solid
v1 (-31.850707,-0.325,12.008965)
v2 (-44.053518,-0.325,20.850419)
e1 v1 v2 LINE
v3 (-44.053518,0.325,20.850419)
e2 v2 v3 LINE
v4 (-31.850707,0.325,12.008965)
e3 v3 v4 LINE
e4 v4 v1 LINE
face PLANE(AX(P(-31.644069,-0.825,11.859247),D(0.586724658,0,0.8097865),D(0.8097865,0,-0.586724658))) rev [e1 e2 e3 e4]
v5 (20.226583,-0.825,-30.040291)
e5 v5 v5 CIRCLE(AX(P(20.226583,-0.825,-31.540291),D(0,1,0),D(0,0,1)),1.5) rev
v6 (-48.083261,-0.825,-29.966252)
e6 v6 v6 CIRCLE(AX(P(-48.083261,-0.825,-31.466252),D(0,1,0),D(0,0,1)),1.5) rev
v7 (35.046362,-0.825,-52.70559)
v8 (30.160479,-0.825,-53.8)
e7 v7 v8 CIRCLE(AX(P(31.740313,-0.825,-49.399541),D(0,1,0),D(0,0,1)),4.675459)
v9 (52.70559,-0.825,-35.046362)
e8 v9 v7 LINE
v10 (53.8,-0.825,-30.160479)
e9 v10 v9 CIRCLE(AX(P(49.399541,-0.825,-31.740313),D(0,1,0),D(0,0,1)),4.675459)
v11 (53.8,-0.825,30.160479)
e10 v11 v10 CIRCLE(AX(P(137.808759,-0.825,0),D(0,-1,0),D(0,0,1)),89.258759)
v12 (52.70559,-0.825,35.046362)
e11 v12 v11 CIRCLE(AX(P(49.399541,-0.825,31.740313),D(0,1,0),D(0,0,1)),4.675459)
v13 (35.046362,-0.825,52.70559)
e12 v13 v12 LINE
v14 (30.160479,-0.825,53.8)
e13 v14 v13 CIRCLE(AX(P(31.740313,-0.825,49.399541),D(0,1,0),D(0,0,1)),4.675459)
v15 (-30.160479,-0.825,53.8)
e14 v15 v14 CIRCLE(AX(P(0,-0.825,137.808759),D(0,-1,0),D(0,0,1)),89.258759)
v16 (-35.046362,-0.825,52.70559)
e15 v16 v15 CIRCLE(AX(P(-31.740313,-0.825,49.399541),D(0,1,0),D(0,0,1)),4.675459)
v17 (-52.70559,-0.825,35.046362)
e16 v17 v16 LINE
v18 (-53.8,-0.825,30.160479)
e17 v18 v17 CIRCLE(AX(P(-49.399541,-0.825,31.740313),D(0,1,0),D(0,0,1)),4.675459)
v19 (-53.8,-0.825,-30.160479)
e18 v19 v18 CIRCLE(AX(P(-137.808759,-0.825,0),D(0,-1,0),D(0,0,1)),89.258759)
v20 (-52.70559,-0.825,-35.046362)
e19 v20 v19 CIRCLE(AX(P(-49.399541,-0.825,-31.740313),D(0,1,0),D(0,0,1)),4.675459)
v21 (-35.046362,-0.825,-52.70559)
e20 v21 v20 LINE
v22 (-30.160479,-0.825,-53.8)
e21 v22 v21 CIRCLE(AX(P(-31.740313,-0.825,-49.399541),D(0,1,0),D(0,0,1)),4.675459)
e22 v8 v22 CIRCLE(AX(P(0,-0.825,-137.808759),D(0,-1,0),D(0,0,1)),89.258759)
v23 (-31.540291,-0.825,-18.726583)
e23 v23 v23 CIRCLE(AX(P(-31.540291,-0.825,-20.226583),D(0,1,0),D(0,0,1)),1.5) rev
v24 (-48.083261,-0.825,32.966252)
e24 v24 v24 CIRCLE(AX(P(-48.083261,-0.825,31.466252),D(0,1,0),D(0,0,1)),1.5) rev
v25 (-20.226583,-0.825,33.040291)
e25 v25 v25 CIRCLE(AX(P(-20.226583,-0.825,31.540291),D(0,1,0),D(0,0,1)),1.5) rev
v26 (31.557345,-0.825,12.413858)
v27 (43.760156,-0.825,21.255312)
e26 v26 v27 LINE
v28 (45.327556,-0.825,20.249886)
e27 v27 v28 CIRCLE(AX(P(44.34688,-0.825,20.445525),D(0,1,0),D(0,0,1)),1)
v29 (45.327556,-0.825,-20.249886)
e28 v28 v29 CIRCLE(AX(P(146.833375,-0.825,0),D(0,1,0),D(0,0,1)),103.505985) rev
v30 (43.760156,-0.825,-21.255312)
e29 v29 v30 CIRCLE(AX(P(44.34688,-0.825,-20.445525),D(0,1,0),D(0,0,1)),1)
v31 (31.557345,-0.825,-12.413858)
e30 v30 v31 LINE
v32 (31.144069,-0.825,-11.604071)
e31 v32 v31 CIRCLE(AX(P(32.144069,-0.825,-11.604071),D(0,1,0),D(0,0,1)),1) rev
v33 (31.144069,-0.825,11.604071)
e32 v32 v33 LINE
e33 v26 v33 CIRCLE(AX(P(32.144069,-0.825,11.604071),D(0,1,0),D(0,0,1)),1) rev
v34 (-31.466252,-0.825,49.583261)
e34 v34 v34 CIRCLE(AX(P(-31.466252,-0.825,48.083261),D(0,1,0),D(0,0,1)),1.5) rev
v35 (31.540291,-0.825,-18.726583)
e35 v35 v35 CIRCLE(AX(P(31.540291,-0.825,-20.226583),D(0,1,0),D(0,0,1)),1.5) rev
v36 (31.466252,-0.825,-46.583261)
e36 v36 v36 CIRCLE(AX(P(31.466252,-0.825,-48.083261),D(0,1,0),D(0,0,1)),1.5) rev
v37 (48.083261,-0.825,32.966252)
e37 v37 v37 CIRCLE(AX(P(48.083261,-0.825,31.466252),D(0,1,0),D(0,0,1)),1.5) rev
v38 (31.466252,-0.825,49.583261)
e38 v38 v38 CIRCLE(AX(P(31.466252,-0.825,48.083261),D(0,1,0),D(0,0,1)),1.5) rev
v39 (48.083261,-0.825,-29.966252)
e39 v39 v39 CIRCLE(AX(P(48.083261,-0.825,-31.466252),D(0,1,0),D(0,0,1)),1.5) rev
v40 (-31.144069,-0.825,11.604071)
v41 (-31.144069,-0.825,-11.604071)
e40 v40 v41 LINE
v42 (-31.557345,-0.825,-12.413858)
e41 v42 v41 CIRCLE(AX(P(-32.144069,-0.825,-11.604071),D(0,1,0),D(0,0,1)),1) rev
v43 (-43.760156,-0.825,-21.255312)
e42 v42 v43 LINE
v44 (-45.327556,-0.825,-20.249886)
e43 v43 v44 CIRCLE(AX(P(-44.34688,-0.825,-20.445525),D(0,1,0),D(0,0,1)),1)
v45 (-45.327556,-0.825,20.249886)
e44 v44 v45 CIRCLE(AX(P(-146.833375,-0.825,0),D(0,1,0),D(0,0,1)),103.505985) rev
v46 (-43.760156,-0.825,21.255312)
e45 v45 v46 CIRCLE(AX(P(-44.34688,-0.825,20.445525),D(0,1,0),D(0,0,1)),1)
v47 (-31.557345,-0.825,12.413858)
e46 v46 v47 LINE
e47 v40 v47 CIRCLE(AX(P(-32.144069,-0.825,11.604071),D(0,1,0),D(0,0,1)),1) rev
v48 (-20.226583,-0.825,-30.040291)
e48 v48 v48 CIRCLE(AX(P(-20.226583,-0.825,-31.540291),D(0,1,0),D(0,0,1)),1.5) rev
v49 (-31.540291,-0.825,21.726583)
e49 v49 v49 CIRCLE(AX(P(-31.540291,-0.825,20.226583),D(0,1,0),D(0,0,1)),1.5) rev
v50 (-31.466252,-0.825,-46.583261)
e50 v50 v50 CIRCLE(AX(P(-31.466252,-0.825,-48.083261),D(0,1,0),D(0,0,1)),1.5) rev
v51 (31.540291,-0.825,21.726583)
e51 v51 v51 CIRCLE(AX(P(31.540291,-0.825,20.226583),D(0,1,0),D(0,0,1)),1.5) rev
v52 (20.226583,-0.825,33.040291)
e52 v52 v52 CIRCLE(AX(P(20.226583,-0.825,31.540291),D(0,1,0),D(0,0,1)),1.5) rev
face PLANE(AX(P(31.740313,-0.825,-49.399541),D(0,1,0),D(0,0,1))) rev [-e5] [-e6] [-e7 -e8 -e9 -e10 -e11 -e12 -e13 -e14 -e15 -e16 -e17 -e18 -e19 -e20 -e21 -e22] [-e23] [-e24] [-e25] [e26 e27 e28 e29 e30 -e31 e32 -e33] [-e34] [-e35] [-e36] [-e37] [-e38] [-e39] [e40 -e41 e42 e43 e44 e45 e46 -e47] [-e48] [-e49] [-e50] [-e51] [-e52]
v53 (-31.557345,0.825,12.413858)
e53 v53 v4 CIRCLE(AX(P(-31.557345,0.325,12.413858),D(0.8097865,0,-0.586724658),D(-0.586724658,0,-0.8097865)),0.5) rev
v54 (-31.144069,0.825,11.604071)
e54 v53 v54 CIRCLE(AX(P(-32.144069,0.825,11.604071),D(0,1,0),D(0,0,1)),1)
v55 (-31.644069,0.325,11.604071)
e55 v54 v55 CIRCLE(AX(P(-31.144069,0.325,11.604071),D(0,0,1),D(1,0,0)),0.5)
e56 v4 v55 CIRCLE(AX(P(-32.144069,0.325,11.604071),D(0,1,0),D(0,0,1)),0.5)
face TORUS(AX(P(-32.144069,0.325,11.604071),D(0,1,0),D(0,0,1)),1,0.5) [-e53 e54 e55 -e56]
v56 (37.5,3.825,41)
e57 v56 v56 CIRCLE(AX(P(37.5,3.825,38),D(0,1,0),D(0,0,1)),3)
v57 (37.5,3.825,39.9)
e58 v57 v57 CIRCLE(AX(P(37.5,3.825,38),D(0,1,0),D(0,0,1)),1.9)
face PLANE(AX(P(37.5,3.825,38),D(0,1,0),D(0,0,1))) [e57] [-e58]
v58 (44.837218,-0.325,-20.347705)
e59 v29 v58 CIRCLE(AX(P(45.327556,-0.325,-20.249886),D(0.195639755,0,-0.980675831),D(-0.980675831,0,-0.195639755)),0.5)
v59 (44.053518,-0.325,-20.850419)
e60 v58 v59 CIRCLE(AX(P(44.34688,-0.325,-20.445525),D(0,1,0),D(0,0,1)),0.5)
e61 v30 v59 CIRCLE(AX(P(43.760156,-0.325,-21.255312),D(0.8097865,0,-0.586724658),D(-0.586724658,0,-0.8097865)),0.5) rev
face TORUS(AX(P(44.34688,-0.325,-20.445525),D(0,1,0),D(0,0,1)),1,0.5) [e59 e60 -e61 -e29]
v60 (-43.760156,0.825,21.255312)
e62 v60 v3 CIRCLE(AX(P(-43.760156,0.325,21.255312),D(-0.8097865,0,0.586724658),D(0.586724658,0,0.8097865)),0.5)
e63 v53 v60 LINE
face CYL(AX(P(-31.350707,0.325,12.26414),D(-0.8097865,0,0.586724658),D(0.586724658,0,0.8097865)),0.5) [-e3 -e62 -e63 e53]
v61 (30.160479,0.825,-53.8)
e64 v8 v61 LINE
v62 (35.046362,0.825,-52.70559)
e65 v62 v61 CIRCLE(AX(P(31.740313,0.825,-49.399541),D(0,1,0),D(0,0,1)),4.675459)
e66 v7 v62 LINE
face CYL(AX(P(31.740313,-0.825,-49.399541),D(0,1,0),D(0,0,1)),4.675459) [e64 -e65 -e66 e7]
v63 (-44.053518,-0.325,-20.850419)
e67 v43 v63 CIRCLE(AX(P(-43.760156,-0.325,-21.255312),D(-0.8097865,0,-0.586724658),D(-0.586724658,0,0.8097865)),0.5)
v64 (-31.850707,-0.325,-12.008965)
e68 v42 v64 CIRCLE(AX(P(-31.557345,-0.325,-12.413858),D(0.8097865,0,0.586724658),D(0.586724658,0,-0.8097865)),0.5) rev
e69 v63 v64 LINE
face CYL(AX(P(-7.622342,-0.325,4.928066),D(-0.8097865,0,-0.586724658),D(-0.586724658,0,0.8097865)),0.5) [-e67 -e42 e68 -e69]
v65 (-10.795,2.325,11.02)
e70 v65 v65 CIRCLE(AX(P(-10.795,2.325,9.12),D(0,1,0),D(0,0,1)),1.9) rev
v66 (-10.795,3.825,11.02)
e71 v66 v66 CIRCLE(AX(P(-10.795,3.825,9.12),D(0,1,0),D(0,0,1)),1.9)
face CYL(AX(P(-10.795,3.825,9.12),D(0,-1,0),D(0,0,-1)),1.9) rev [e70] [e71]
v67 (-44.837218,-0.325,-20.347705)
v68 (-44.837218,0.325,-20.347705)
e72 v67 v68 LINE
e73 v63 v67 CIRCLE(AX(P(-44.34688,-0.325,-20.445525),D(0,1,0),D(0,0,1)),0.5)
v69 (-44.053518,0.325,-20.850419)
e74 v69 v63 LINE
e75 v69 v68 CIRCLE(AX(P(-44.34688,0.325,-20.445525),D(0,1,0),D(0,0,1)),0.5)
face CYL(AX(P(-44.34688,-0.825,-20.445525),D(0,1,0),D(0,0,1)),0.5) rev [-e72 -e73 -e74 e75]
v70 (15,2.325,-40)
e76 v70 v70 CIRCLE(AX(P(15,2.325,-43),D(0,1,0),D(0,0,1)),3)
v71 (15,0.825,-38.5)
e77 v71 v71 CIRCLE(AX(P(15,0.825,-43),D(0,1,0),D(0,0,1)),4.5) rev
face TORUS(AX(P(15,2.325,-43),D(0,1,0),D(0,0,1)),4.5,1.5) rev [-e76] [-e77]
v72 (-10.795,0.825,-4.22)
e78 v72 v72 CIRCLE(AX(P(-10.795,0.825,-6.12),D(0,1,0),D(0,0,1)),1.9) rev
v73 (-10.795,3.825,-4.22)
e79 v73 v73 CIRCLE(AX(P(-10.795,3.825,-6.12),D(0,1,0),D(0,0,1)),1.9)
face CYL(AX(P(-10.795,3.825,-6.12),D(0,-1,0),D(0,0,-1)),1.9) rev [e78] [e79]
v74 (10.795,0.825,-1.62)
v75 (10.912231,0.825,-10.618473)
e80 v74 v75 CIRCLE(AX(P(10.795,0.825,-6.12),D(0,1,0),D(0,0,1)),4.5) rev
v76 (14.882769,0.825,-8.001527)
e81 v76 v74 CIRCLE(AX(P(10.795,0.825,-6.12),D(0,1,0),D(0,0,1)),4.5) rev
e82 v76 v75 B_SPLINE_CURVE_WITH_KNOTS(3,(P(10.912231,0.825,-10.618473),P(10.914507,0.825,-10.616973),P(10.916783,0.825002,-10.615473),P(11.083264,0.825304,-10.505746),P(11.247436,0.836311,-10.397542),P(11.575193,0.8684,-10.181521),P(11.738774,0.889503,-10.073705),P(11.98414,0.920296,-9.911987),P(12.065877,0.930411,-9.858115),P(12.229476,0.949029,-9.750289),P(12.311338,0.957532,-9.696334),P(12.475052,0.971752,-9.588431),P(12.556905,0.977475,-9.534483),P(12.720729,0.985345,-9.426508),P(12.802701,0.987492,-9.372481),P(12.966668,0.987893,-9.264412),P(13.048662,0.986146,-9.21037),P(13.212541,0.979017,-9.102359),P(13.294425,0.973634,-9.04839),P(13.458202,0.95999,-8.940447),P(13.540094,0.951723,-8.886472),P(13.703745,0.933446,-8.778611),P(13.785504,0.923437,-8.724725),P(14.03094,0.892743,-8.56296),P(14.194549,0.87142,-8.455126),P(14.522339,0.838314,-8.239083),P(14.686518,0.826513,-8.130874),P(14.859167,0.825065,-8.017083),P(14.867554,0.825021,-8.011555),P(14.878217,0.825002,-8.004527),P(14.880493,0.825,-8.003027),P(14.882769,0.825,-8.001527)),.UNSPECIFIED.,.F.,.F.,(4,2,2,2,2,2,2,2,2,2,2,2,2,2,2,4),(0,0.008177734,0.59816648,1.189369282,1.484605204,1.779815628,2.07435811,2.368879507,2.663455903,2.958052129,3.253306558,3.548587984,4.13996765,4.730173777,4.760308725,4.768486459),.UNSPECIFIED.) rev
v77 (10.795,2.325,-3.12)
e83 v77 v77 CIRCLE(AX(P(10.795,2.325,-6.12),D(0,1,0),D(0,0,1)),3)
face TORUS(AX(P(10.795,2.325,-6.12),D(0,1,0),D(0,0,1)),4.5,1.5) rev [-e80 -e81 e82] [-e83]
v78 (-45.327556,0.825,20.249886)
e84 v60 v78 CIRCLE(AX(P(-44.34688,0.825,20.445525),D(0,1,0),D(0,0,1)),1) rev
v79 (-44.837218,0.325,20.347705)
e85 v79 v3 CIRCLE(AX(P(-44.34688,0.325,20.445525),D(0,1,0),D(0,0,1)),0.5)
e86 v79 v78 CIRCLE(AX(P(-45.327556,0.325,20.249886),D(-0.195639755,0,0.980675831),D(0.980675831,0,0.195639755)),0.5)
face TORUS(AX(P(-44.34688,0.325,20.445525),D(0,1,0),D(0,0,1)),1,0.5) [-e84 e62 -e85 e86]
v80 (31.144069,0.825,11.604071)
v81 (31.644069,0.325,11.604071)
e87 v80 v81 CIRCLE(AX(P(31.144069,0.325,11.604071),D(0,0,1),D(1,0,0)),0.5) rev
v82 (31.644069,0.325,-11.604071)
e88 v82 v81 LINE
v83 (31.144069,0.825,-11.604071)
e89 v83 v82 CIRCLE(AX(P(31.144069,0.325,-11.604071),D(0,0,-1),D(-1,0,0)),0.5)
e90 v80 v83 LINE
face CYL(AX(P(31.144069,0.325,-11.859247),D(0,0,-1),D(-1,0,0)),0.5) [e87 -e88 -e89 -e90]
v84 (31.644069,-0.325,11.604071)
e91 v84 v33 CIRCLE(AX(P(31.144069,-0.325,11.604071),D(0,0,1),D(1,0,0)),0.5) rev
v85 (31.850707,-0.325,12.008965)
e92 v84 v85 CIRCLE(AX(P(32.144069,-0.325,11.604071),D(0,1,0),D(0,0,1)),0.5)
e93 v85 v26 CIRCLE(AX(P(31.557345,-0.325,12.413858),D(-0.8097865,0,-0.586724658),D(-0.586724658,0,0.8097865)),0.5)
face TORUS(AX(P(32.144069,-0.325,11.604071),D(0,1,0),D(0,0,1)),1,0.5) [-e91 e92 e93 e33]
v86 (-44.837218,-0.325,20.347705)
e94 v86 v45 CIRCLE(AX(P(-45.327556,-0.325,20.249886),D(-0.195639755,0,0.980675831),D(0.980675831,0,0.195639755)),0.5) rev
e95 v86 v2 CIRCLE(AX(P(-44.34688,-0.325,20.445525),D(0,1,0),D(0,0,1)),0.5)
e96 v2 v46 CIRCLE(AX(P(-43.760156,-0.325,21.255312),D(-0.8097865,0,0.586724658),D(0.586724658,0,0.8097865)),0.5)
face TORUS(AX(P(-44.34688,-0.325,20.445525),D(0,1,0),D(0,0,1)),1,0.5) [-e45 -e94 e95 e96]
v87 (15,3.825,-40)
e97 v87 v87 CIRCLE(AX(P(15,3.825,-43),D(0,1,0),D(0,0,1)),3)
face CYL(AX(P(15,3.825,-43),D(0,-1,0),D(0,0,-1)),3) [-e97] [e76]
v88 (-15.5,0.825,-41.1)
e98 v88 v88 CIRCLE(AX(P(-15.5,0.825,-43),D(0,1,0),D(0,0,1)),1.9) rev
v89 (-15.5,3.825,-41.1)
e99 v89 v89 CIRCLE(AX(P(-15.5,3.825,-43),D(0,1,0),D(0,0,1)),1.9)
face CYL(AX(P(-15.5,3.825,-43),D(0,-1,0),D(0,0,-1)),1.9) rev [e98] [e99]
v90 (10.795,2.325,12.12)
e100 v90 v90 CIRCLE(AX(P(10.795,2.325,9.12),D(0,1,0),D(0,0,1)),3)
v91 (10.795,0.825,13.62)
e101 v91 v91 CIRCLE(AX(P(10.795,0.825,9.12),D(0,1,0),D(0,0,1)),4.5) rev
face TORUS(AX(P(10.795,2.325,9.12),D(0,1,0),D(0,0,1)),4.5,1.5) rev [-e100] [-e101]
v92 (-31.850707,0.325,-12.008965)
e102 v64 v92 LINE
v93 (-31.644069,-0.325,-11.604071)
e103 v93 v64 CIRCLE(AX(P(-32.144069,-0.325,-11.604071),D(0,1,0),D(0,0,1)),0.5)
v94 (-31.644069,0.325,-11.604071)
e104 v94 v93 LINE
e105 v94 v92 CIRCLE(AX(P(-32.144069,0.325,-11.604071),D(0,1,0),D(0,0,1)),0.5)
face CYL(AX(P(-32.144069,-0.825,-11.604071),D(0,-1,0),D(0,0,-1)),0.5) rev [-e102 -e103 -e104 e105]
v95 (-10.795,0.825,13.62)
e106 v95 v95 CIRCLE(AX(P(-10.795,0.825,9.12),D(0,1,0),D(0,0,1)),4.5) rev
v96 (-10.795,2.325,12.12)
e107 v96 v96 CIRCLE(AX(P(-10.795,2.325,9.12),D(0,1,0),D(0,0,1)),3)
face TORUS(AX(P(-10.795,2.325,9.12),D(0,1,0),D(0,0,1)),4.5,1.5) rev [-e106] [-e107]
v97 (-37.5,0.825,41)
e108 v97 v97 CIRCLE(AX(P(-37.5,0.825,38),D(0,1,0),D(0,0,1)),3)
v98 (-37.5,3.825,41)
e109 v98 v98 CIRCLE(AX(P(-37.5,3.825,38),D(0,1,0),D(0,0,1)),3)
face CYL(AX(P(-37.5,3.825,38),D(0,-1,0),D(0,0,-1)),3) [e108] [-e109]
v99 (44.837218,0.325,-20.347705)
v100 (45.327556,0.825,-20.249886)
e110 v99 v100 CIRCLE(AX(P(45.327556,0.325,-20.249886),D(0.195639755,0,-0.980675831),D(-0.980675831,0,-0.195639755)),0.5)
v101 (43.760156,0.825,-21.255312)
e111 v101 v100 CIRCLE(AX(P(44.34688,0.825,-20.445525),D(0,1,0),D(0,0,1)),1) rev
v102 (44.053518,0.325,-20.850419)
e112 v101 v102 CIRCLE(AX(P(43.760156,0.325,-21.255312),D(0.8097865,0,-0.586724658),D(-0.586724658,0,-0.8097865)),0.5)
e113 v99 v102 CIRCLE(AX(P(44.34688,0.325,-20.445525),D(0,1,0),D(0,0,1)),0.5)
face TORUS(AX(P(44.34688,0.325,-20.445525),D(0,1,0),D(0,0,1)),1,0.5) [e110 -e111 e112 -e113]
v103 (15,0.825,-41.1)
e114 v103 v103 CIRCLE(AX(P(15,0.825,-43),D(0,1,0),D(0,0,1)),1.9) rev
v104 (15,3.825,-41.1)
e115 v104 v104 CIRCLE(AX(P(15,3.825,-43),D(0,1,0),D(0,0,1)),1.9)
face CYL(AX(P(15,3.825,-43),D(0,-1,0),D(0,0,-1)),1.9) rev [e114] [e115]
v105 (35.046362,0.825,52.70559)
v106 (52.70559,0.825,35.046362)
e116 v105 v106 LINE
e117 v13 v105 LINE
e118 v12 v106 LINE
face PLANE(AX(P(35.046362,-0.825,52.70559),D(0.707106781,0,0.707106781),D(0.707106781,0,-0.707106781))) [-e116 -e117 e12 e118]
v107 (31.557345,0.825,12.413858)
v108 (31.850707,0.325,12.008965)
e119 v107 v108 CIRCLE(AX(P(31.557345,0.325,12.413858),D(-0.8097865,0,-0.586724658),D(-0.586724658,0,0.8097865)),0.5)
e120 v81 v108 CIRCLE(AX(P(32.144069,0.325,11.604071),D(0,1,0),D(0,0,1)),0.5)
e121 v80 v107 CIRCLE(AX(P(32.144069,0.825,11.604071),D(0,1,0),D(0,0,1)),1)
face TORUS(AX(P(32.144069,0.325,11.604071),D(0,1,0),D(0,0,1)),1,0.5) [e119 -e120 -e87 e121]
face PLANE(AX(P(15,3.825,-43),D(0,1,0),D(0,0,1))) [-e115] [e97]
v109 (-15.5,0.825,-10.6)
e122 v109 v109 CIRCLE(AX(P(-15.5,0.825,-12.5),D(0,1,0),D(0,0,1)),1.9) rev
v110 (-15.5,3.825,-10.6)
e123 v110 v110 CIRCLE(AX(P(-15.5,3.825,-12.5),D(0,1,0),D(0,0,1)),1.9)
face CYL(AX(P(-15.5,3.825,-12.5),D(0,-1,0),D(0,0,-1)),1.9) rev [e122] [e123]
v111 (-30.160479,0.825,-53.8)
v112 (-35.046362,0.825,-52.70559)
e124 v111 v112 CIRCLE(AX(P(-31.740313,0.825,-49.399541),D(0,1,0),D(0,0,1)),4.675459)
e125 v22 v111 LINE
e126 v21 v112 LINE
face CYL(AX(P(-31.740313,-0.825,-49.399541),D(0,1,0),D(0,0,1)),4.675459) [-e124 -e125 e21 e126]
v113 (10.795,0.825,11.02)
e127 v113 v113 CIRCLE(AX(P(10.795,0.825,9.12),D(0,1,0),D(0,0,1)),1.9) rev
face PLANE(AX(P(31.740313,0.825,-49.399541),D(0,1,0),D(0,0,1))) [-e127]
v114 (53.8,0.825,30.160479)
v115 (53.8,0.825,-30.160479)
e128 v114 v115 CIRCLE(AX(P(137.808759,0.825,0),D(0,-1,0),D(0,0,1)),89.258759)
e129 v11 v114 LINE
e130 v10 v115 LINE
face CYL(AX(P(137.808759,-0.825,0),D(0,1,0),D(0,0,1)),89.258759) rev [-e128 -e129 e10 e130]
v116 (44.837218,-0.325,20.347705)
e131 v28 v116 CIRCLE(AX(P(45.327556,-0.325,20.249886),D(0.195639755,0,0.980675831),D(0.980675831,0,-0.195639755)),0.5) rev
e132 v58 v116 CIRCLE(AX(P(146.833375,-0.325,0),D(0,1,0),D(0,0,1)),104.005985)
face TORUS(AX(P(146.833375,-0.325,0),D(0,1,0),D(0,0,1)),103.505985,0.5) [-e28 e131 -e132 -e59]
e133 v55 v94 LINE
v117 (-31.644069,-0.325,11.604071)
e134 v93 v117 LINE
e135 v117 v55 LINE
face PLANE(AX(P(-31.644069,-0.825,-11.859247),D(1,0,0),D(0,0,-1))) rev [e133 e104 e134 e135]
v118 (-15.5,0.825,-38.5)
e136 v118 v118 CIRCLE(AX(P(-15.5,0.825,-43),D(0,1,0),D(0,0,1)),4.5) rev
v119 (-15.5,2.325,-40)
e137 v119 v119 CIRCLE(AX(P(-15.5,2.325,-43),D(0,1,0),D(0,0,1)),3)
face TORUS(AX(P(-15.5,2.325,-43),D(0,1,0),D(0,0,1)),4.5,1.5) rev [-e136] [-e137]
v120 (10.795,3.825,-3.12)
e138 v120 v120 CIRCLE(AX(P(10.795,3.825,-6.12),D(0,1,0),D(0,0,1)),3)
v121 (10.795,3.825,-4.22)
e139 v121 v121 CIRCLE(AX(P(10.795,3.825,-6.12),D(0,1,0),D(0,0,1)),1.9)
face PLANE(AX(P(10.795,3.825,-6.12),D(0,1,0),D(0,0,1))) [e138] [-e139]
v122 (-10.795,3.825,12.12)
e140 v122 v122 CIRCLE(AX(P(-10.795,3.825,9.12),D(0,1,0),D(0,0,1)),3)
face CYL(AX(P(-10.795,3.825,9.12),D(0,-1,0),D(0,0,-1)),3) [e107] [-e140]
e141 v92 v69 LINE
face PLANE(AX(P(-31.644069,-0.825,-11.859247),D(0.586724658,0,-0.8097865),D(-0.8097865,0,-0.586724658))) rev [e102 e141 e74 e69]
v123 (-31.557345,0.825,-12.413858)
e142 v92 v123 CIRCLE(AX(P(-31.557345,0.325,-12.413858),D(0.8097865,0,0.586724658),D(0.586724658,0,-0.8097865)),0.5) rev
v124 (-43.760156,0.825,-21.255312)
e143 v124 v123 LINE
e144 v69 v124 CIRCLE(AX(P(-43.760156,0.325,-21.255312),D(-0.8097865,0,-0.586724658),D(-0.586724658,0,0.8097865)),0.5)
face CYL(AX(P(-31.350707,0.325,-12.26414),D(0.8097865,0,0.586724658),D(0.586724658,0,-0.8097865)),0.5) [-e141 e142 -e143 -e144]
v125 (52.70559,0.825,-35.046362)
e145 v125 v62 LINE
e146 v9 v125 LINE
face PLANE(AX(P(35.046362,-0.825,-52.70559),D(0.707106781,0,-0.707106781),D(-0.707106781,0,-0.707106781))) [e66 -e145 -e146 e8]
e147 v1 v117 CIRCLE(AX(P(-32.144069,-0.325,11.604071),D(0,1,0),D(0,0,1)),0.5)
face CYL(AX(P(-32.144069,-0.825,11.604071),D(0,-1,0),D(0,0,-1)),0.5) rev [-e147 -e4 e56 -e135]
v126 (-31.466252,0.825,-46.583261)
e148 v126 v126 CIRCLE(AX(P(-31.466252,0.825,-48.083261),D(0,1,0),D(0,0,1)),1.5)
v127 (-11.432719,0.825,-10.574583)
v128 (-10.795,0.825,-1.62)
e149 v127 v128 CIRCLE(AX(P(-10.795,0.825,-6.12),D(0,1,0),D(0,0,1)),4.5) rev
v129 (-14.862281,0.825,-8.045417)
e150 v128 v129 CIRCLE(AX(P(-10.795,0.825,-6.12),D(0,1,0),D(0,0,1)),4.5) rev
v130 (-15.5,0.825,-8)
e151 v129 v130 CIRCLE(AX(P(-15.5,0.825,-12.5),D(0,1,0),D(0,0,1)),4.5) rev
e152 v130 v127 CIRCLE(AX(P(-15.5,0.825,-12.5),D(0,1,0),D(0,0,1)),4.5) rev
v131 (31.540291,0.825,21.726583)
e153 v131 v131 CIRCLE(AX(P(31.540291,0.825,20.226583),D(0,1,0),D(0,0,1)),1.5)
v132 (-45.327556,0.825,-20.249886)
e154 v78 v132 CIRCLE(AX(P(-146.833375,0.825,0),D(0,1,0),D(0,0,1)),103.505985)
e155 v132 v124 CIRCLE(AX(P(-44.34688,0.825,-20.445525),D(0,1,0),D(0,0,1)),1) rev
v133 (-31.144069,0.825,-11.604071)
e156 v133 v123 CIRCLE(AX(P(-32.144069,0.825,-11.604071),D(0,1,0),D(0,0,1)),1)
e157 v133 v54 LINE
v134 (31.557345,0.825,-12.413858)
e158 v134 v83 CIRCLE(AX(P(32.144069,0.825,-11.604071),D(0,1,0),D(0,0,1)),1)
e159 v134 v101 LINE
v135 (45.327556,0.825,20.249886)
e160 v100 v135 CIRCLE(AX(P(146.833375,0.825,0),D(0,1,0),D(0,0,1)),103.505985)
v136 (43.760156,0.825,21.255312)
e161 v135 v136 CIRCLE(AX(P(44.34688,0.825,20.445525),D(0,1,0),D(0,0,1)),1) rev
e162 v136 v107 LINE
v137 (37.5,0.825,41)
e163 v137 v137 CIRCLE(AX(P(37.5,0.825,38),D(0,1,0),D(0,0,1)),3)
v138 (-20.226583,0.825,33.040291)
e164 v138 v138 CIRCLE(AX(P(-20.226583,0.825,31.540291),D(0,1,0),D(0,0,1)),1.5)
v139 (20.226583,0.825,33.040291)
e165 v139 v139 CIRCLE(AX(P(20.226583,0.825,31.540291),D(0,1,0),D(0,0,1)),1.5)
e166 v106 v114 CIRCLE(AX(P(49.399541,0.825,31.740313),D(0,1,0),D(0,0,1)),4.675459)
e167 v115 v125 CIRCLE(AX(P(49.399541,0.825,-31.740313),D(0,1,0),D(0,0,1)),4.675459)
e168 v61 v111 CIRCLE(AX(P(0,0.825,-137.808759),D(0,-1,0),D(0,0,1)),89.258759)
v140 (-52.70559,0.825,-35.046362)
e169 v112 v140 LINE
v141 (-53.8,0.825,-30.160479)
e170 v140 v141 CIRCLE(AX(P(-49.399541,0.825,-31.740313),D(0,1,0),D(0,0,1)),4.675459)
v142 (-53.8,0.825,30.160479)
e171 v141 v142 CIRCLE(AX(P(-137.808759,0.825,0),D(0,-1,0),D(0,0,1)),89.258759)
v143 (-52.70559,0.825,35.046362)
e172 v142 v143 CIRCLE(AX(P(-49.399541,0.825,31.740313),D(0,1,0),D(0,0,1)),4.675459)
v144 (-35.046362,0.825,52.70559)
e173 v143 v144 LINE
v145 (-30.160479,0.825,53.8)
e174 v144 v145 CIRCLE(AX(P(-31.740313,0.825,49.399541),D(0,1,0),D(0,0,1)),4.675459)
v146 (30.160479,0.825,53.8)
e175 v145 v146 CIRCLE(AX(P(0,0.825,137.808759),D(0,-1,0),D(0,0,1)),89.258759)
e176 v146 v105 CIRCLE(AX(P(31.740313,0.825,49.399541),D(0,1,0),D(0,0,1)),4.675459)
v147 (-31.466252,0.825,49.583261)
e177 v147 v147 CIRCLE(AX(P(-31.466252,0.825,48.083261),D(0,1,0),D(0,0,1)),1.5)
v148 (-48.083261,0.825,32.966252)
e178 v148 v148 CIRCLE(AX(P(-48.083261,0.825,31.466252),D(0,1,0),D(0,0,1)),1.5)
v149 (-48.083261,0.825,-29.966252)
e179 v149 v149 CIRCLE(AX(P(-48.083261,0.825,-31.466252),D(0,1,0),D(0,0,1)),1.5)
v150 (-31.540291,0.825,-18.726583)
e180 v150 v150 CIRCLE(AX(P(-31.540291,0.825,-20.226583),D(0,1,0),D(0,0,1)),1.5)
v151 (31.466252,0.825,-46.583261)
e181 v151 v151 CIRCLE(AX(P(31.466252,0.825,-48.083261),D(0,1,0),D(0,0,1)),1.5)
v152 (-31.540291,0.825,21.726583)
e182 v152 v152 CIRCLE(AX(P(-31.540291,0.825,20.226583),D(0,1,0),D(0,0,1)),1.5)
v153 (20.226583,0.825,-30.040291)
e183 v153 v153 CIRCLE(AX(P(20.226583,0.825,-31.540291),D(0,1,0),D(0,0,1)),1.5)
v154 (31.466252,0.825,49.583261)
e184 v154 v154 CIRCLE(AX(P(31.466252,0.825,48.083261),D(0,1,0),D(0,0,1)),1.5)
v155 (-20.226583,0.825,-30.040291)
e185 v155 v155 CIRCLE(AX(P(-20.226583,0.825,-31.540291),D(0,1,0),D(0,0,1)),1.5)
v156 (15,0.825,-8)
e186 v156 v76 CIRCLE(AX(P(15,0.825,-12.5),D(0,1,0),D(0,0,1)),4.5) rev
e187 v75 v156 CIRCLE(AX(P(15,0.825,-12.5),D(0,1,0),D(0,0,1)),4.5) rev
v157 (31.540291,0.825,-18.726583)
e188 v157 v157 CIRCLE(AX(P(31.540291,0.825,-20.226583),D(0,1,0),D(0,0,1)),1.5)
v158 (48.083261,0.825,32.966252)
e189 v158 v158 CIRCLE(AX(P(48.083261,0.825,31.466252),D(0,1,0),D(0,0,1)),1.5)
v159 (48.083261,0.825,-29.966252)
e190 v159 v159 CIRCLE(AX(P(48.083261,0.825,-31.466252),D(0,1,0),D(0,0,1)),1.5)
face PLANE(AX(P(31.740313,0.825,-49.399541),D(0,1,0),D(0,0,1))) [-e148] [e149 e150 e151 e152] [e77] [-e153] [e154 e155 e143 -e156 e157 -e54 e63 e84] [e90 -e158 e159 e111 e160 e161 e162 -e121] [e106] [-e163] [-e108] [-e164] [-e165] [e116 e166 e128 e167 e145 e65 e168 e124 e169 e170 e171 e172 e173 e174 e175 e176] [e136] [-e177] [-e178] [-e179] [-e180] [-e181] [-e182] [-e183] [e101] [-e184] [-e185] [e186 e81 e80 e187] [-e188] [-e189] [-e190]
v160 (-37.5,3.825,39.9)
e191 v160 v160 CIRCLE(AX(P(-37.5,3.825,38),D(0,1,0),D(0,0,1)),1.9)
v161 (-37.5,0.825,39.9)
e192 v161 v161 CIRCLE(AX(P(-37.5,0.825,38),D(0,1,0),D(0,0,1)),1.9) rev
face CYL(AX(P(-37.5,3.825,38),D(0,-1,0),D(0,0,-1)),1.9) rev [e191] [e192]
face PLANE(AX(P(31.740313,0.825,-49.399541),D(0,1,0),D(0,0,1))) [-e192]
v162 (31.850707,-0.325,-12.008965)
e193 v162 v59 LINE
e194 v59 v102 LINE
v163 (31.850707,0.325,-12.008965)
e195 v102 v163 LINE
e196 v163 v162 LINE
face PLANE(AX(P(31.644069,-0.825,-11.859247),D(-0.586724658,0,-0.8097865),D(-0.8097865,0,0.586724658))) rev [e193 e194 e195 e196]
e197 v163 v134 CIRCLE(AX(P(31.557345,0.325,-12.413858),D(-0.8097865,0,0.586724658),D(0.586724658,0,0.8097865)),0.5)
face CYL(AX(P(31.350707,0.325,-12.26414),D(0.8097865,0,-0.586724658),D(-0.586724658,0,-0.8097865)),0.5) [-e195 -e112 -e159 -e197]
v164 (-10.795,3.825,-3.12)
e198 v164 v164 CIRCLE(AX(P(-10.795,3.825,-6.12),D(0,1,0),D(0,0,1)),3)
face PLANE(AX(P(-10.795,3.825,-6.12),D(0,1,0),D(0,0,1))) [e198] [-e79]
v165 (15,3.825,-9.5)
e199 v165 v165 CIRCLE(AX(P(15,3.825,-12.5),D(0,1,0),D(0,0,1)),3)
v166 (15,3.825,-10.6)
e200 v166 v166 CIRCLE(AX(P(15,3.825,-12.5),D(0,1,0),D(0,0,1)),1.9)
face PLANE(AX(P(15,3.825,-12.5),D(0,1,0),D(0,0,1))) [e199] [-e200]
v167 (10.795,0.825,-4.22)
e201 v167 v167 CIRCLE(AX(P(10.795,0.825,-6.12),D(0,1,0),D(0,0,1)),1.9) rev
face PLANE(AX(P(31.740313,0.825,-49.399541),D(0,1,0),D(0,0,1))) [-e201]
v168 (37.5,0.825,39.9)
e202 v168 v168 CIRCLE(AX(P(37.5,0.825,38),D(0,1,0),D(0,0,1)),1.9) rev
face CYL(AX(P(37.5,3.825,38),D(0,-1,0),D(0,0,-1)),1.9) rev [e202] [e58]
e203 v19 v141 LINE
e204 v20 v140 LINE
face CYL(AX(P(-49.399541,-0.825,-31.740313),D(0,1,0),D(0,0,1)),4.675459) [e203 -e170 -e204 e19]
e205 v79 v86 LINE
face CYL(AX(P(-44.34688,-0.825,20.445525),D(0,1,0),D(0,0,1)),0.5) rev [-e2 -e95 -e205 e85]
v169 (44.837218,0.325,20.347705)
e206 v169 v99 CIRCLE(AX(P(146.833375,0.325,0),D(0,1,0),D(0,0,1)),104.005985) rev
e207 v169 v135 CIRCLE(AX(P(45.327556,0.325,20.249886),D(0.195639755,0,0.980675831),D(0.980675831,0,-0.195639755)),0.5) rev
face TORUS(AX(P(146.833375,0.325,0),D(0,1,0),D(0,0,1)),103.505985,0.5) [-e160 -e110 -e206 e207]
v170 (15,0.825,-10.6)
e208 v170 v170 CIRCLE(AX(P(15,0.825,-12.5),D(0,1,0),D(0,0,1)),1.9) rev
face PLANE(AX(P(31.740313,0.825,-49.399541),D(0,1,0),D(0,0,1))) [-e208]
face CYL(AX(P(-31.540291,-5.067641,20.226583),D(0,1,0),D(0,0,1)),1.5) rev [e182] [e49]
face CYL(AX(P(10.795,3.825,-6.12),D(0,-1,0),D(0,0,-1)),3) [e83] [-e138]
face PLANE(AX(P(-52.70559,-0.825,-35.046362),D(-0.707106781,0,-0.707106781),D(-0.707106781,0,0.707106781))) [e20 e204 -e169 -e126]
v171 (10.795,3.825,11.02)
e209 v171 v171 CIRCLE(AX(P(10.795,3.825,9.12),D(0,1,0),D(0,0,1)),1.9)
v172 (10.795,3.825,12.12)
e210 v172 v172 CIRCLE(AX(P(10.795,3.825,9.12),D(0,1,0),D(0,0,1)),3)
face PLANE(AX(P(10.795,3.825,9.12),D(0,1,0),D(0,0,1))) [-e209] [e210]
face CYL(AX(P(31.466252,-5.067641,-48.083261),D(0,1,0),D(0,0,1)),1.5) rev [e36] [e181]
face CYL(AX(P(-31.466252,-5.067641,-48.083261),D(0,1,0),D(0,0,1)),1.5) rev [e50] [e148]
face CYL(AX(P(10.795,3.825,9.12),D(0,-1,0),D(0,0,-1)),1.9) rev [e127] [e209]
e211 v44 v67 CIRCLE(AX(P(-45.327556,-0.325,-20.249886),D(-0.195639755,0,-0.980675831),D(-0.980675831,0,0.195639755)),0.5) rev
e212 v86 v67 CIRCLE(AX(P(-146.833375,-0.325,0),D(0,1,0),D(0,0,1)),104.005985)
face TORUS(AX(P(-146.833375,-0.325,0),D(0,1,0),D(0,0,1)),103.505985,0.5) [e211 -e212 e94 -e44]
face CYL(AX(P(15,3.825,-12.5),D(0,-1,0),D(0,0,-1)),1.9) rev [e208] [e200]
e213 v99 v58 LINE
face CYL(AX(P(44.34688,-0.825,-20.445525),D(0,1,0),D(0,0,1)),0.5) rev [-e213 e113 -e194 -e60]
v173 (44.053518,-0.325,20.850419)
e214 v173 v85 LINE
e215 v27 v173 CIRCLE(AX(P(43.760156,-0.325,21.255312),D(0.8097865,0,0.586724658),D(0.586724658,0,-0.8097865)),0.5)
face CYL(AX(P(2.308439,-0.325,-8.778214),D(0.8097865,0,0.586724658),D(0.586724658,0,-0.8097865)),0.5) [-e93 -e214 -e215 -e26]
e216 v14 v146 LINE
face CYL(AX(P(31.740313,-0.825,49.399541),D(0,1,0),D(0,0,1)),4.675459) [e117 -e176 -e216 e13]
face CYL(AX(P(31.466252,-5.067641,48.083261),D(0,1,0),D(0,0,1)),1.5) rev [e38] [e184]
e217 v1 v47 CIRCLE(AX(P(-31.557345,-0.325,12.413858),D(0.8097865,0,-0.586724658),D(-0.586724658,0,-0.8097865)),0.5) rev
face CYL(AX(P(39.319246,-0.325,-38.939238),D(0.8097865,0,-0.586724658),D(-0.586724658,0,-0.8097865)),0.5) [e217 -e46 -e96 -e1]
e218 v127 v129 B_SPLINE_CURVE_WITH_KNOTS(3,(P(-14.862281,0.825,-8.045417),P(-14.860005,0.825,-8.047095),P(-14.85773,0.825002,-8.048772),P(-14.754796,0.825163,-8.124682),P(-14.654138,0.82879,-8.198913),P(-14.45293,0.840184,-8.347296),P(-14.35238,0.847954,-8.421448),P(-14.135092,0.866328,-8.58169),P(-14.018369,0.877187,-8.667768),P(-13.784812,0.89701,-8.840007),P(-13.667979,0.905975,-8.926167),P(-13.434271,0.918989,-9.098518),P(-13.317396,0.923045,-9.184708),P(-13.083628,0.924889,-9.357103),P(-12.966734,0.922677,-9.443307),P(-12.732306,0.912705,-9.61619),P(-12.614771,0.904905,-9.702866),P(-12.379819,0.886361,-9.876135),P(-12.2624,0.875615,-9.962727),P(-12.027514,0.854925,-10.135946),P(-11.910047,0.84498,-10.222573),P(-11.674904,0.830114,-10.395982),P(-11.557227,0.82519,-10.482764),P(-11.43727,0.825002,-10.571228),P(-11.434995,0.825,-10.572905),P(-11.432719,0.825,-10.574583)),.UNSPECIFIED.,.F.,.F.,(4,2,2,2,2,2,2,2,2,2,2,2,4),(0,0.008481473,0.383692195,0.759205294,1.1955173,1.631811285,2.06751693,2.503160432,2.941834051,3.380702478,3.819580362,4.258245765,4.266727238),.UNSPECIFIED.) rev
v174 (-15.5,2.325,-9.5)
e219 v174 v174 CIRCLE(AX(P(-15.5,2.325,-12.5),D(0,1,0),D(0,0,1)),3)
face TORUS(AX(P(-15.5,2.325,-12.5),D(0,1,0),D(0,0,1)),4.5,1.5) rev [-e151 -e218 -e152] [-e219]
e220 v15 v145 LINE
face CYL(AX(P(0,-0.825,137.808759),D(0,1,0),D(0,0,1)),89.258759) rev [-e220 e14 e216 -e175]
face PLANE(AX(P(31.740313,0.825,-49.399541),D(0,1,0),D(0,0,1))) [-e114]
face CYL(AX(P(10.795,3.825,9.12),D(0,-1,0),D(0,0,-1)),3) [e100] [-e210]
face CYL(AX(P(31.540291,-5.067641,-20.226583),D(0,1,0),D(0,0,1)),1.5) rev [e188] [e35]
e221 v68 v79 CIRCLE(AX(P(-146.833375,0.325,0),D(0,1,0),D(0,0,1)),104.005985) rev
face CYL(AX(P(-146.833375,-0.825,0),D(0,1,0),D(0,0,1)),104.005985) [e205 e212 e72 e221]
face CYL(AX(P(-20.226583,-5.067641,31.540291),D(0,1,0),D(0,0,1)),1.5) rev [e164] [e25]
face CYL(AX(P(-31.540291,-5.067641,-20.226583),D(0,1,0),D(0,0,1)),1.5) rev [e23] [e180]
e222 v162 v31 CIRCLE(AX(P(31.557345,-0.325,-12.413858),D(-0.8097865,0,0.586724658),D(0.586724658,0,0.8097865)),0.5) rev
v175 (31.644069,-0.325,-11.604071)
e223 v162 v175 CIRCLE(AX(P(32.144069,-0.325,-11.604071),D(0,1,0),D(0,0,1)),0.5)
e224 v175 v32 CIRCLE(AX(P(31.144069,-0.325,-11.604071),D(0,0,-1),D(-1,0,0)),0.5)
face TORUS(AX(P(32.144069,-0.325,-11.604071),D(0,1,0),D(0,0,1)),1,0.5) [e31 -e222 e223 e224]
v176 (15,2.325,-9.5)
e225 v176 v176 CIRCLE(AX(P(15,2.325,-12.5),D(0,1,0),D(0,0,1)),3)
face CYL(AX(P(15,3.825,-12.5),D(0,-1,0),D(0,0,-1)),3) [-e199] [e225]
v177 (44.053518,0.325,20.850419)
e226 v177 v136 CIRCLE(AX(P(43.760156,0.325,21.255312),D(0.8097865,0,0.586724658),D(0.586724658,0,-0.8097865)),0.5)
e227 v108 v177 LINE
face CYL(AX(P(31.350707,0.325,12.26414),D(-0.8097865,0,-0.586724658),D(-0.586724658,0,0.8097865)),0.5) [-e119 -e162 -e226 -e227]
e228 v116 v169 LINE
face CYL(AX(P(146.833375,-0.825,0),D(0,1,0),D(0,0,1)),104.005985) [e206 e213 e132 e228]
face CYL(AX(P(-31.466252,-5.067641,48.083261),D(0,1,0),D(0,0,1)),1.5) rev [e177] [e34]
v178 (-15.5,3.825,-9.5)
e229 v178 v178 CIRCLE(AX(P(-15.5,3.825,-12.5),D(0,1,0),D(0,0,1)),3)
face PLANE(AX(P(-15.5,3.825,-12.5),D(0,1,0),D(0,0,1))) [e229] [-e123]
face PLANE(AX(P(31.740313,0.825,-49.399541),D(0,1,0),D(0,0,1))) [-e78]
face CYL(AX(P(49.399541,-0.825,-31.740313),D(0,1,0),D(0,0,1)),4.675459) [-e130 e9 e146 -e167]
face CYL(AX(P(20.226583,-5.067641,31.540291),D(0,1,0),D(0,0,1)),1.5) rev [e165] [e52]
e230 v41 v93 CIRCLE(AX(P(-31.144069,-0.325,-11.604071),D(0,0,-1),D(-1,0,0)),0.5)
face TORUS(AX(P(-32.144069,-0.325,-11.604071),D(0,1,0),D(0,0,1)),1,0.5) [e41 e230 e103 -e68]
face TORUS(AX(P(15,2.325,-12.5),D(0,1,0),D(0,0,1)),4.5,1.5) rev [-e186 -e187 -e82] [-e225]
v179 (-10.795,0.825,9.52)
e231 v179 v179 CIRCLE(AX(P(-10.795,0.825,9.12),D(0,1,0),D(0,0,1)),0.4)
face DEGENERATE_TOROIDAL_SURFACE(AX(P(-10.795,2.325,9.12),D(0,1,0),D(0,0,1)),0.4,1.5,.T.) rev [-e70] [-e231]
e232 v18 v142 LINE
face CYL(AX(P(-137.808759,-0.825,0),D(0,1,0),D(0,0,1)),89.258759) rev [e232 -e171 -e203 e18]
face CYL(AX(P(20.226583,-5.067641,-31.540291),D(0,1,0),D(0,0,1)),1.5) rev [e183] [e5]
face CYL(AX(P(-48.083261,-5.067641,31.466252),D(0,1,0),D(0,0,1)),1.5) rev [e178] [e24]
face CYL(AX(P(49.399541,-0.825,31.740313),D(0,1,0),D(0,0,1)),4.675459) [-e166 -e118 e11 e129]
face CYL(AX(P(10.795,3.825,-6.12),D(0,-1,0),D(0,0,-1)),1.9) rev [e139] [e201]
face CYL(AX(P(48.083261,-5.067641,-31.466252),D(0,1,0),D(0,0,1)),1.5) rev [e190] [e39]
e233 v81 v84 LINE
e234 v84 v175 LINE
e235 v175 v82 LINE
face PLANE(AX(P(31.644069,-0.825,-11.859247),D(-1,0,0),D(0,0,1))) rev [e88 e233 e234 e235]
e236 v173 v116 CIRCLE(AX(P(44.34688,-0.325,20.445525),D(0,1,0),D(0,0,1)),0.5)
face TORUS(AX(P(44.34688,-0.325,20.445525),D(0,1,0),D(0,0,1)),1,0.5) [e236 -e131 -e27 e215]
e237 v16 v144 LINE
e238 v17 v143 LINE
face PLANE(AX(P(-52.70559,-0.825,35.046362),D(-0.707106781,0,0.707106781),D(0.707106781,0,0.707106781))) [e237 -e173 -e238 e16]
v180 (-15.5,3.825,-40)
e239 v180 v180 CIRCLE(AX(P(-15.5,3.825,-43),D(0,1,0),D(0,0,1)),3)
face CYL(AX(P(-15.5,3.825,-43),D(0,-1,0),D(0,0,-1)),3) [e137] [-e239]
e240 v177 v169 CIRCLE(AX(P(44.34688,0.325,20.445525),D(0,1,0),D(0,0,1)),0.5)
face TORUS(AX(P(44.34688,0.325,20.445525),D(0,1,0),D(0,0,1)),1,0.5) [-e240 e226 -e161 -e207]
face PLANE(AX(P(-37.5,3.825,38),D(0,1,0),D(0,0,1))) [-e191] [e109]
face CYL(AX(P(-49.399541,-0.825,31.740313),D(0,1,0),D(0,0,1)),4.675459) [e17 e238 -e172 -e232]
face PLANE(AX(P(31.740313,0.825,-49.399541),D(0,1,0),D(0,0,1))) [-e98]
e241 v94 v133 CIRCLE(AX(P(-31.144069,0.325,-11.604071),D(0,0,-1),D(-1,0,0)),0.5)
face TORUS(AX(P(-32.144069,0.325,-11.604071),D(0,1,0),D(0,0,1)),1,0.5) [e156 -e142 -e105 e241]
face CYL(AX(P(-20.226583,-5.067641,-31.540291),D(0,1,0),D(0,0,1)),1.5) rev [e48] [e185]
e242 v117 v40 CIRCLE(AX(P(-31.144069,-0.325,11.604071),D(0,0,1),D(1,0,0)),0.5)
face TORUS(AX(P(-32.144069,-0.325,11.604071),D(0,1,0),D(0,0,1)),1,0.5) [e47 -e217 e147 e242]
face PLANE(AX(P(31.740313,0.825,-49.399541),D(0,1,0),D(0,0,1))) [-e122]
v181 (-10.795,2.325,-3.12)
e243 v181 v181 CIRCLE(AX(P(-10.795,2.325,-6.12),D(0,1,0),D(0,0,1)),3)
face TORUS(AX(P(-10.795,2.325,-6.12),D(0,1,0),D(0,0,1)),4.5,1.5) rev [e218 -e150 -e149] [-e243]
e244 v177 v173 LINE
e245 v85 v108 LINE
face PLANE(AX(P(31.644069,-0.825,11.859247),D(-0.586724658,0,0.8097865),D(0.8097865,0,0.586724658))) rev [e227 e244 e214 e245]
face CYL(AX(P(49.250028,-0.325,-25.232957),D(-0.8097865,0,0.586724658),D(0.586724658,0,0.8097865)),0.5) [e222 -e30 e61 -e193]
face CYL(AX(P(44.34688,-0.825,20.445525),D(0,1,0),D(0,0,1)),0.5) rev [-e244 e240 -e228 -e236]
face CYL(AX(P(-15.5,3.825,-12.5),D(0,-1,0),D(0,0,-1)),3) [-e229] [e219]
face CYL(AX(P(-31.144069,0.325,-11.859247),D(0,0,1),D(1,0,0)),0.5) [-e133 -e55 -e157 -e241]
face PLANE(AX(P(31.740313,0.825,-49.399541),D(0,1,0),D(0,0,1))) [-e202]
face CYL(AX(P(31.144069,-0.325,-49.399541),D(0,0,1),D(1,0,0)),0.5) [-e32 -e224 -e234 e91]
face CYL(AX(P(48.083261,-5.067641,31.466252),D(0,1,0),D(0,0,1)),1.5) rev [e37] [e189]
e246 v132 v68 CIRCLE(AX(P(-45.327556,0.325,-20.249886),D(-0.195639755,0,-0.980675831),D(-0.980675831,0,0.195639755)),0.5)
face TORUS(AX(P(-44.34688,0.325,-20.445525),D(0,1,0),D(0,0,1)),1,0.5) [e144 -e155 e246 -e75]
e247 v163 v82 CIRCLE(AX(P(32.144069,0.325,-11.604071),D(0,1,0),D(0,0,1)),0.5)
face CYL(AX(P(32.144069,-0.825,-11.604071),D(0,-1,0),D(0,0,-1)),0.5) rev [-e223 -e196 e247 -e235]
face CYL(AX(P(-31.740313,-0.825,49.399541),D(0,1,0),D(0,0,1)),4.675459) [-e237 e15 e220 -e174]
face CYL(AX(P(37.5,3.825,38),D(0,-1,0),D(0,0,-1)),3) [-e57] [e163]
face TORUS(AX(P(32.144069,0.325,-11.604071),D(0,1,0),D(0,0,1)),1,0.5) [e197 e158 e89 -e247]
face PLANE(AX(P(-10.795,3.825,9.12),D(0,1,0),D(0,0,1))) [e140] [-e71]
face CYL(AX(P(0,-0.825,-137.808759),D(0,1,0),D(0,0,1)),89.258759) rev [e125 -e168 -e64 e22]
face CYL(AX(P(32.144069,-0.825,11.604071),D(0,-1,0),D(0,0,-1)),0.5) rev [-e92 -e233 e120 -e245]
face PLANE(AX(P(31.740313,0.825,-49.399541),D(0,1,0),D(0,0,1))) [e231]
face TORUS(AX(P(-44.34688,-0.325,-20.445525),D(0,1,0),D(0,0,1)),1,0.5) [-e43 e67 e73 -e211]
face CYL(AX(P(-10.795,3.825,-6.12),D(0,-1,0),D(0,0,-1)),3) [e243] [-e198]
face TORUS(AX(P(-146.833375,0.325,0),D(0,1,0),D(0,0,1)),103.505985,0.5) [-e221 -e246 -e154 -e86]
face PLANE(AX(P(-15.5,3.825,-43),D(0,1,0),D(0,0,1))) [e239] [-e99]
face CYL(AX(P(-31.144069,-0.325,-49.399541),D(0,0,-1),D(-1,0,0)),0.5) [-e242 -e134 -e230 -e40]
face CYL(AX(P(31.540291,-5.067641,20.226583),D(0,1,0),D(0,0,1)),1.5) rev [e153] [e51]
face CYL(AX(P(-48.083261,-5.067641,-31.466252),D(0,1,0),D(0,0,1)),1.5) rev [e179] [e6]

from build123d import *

# Parameters (mm, degrees)
BOSS_EXTRUDE1_DEPTH      = 0.825
BOSS_EXTRUDE1_DEPTH_BACK = 0.825
SKETCH3_R                = 1.5
CUT_EXTRUDE2_DEPTH       = 1.65
SKETCH16_R               = 3
SKETCH16_R_2             = 1.9
BOSS_EXTRUDE7_DEPTH      = 3
FILLET5_R                = 1.5
CUT_EXTRUDE6_DEPTH       = 77.532419601
FILLET6_R                = 0.5


with BuildPart() as part:
    # Sketch1 → Boss-Extrude1 (new, two sides: drawn at the far end of the back side and taken through both)
    with BuildSketch(Plane(origin=(0, 0, 0), x_dir=(1, 0, 0), z_dir=(0, 1, 0)).offset(-BOSS_EXTRUDE1_DEPTH_BACK)):
        with BuildLine():
            Line((35.046361717, 52.705589829), (52.705589829, 35.046361717))
            ThreePointArc((52.705589829, 35.046361717), (53.961944938, 32.762265708), (53.8, 30.160478519))
            ThreePointArc((53.8, 30.160478519), (48.55, 0), (53.8, -30.160478519))
            ThreePointArc((53.8, -30.160478519), (53.961944938, -32.762265708), (52.705589829, -35.046361717))
            Line((52.705589829, -35.046361717), (35.046361717, -52.705589829))
            ThreePointArc((35.046361717, -52.705589829), (32.762265708, -53.961944938), (30.160478519, -53.8))
            ThreePointArc((30.160478519, -53.8), (0, -48.55), (-30.160478519, -53.8))
            ThreePointArc((-30.160478519, -53.8), (-32.762265708, -53.961944938), (-35.046361717, -52.705589829))
            Line((-35.046361717, -52.705589829), (-52.705589829, -35.046361717))
            ThreePointArc((-52.705589829, -35.046361717), (-53.961944938, -32.762265708), (-53.8, -30.160478519))
            ThreePointArc((-53.8, -30.160478519), (-48.55, 0), (-53.8, 30.160478519))
            ThreePointArc((-53.8, 30.160478519), (-53.961944938, 32.762265708), (-52.705589829, 35.046361717))
            Line((-52.705589829, 35.046361717), (-35.046361717, 52.705589829))
            ThreePointArc((-35.046361717, 52.705589829), (-32.762265708, 53.961944938), (-30.160478519, 53.8))
            ThreePointArc((-30.160478519, 53.8), (0, 48.55), (30.160478519, 53.8))
            ThreePointArc((30.160478519, 53.8), (32.762265708, 53.961944938), (35.046361717, 52.705589829))
        make_face()
    extrude(amount=BOSS_EXTRUDE1_DEPTH + BOSS_EXTRUDE1_DEPTH_BACK)

    # Sketch3 → Cut-Extrude2 (cut)
    with BuildSketch(Plane(origin=(0, 0.825, 0), x_dir=(1, 0, 0), z_dir=(0, 1, 0))):
        with Locations(Location((-48.083261121, -31.466251763, 0), (0, 0, 270))):
            Circle(SKETCH3_R)
        with Locations(Location((-31.466251763, -48.083261121, 0), (0, 0, 270))):
            Circle(SKETCH3_R)
        with Locations(Location((31.466251763, -48.083261121, 0), (0, 0, 270))):
            Circle(SKETCH3_R)
        with Locations(Location((48.083261121, -31.466251763, 0), (0, 0, 270))):
            Circle(SKETCH3_R)
        with Locations(Location((48.083261121, 31.466251763, 0), (0, 0, 270))):
            Circle(SKETCH3_R)
        with Locations(Location((31.466251763, 48.083261121, 0), (0, 0, 270))):
            Circle(SKETCH3_R)
        with Locations(Location((-31.466251763, 48.083261121, 0), (0, 0, 270))):
            Circle(SKETCH3_R)
        with Locations(Location((-48.083261121, 31.466251763, 0), (0, 0, 270))):
            Circle(SKETCH3_R)
        with Locations(Location((-31.540291459, -20.22658296, 0), (0, 0, 270))):
            Circle(SKETCH3_R)
        with Locations(Location((-20.22658296, -31.540291459, 0), (0, 0, 270))):
            Circle(SKETCH3_R)
        with Locations(Location((-31.540291459, 20.22658296, 0), (0, 0, 270))):
            Circle(SKETCH3_R)
        with Locations(Location((-20.22658296, 31.540291459, 0), (0, 0, 270))):
            Circle(SKETCH3_R)
        with Locations(Location((20.22658296, 31.540291459, 0), (0, 0, 270))):
            Circle(SKETCH3_R)
        with Locations(Location((31.540291459, 20.22658296, 0), (0, 0, 270))):
            Circle(SKETCH3_R)
        with Locations(Location((31.540291459, -20.22658296, 0), (0, 0, 270))):
            Circle(SKETCH3_R)
        with Locations(Location((20.22658296, -31.540291459, 0), (0, 0, 270))):
            Circle(SKETCH3_R)
    extrude(amount=-CUT_EXTRUDE2_DEPTH, mode=Mode.SUBTRACT)

    # Sketch16 → Boss-Extrude7 (add)
    # profile 1 of 10: a face of its own
    with BuildSketch(Plane(origin=(0, 0.825, 0), x_dir=(1, 0, 0), z_dir=(0, 1, 0))):
        with Locations(Location((-15.5, 43, 0), (0, 0, 270))):
            Circle(SKETCH16_R)
        with Locations(Location((-15.5, 43, 0), (0, 0, 270))):
            Circle(SKETCH16_R_2, mode=Mode.SUBTRACT)
    # profile 2 of 10: a face of its own
    with BuildSketch(Plane(origin=(0, 0.825, 0), x_dir=(1, 0, 0), z_dir=(0, 1, 0))):
        with Locations(Location((15, 43, 0), (0, 0, 270))):
            Circle(SKETCH16_R)
        with Locations(Location((15, 43, 0), (0, 0, 270))):
            Circle(SKETCH16_R_2, mode=Mode.SUBTRACT)
    # profile 3 of 10: a face of its own
    with BuildSketch(Plane(origin=(0, 0.825, 0), x_dir=(1, 0, 0), z_dir=(0, 1, 0))):
        with Locations(Location((15, 12.5, 0), (0, 0, 270))):
            Circle(SKETCH16_R)
        with Locations(Location((15, 12.5, 0), (0, 0, 270))):
            Circle(SKETCH16_R_2, mode=Mode.SUBTRACT)
    # profile 4 of 10: a face of its own
    with BuildSketch(Plane(origin=(0, 0.825, 0), x_dir=(1, 0, 0), z_dir=(0, 1, 0))):
        with Locations(Location((-15.5, 12.5, 0), (0, 0, 270))):
            Circle(SKETCH16_R)
        with Locations(Location((-15.5, 12.5, 0), (0, 0, 270))):
            Circle(SKETCH16_R_2, mode=Mode.SUBTRACT)
    # profile 5 of 10: a face of its own
    with BuildSketch(Plane(origin=(0, 0.825, 0), x_dir=(1, 0, 0), z_dir=(0, 1, 0))):
        with Locations(Location((10.795, 6.12, 0), (0, 0, 270))):
            Circle(SKETCH16_R)
        with Locations(Location((10.795, 6.12, 0), (0, 0, 270))):
            Circle(SKETCH16_R_2, mode=Mode.SUBTRACT)
    # profile 6 of 10: a face of its own
    with BuildSketch(Plane(origin=(0, 0.825, 0), x_dir=(1, 0, 0), z_dir=(0, 1, 0))):
        with Locations(Location((-10.795, 6.12, 0), (0, 0, 270))):
            Circle(SKETCH16_R)
        with Locations(Location((-10.795, 6.12, 0), (0, 0, 270))):
            Circle(SKETCH16_R_2, mode=Mode.SUBTRACT)
    # profile 7 of 10: a face of its own
    with BuildSketch(Plane(origin=(0, 0.825, 0), x_dir=(1, 0, 0), z_dir=(0, 1, 0))):
        with Locations(Location((10.795, -9.12, 0), (0, 0, 270))):
            Circle(SKETCH16_R)
        with Locations(Location((10.795, -9.12, 0), (0, 0, 270))):
            Circle(SKETCH16_R_2, mode=Mode.SUBTRACT)
    # profile 8 of 10: a face of its own
    with BuildSketch(Plane(origin=(0, 0.825, 0), x_dir=(1, 0, 0), z_dir=(0, 1, 0))):
        with Locations(Location((-10.795, -9.12, 0), (0, 0, 270))):
            Circle(SKETCH16_R)
        with Locations(Location((-10.795, -9.12, 0), (0, 0, 270))):
            Circle(SKETCH16_R_2, mode=Mode.SUBTRACT)
    # profile 9 of 10: a face of its own
    with BuildSketch(Plane(origin=(0, 0.825, 0), x_dir=(1, 0, 0), z_dir=(0, 1, 0))):
        with Locations(Location((-37.5, -38, 0), (0, 0, 270))):
            Circle(SKETCH16_R)
        with Locations(Location((-37.5, -38, 0), (0, 0, 270))):
            Circle(SKETCH16_R_2, mode=Mode.SUBTRACT)
    # profile 10 of 10: a face of its own
    with BuildSketch(Plane(origin=(0, 0.825, 0), x_dir=(1, 0, 0), z_dir=(0, 1, 0))):
        with Locations(Location((37.5, -38, 0), (0, 0, 270))):
            Circle(SKETCH16_R)
        with Locations(Location((37.5, -38, 0), (0, 0, 270))):
            Circle(SKETCH16_R_2, mode=Mode.SUBTRACT)
    extrude(amount=BOSS_EXTRUDE7_DEPTH)

    # Fillet5
    # the kernel refuses this fillet: 1.5 mm, written as the material it adds along each edge
    with BuildSketch(Plane(origin=(-15.5, 0.825, -43), x_dir=(0, 0, 1), z_dir=(-1, 0, 0))) as fillet5_piece_1:
        with BuildLine():
            CenterArc((3 + FILLET5_R, FILLET5_R), FILLET5_R, 180, 90)
            Line((3, FILLET5_R), (3, 0))
            Line((3, 0), (3 + FILLET5_R, 0))
        make_face()
    revolve(axis=Axis((-15.5, 0.825, -43), (0, 1, 0)))
    with BuildSketch(Plane(origin=(15, 0.825, -43), x_dir=(0, 0, 1), z_dir=(-1, 0, 0))) as fillet5_piece_2:
        with BuildLine():
            CenterArc((3 + FILLET5_R, FILLET5_R), FILLET5_R, 180, 90)
            Line((3, FILLET5_R), (3, 0))
            Line((3, 0), (3 + FILLET5_R, 0))
        make_face()
    revolve(axis=Axis((15, 0.825, -43), (0, 1, 0)))
    with BuildSketch(Plane(origin=(15, 0.825, -12.5), x_dir=(0, 0, 1), z_dir=(-1, 0, 0))) as fillet5_piece_3:
        with BuildLine():
            CenterArc((3 + FILLET5_R, FILLET5_R), FILLET5_R, 180, 90)
            Line((3, FILLET5_R), (3, 0))
            Line((3, 0), (3 + FILLET5_R, 0))
        make_face()
    revolve(axis=Axis((15, 0.825, -12.5), (0, 1, 0)))
    with BuildSketch(Plane(origin=(-15.5, 0.825, -12.5), x_dir=(0, 0, 1), z_dir=(-1, 0, 0))) as fillet5_piece_4:
        with BuildLine():
            CenterArc((3 + FILLET5_R, FILLET5_R), FILLET5_R, 180, 90)
            Line((3, FILLET5_R), (3, 0))
            Line((3, 0), (3 + FILLET5_R, 0))
        make_face()
    revolve(axis=Axis((-15.5, 0.825, -12.5), (0, 1, 0)))
    with BuildSketch(Plane(origin=(10.795, 0.825, -6.12), x_dir=(0, 0, 1), z_dir=(-1, 0, 0))) as fillet5_piece_5:
        with BuildLine():
            CenterArc((3 + FILLET5_R, FILLET5_R), FILLET5_R, 180, 90)
            Line((3, FILLET5_R), (3, 0))
            Line((3, 0), (3 + FILLET5_R, 0))
        make_face()
    revolve(axis=Axis((10.795, 0.825, -6.12), (0, 1, 0)))
    with BuildSketch(Plane(origin=(-10.795, 0.825, -6.12), x_dir=(0, 0, 1), z_dir=(-1, 0, 0))) as fillet5_piece_6:
        with BuildLine():
            CenterArc((3 + FILLET5_R, FILLET5_R), FILLET5_R, 180, 90)
            Line((3, FILLET5_R), (3, 0))
            Line((3, 0), (3 + FILLET5_R, 0))
        make_face()
    revolve(axis=Axis((-10.795, 0.825, -6.12), (0, 1, 0)))
    with BuildSketch(Plane(origin=(10.795, 0.825, 9.12), x_dir=(0, 0, 1), z_dir=(-1, 0, 0))) as fillet5_piece_7:
        with BuildLine():
            CenterArc((3 + FILLET5_R, FILLET5_R), FILLET5_R, 180, 90)
            Line((3, FILLET5_R), (3, 0))
            Line((3, 0), (3 + FILLET5_R, 0))
        make_face()
    revolve(axis=Axis((10.795, 0.825, 9.12), (0, 1, 0)))
    with BuildSketch(Plane(origin=(-10.795, 0.825, 9.12), x_dir=(0, 0, 1), z_dir=(-1, 0, 0))) as fillet5_piece_8:
        with BuildLine():
            CenterArc((1.9 - FILLET5_R, FILLET5_R), FILLET5_R, 270, 90)
            Line((1.9 - FILLET5_R, 0), (1.9, 0))
            Line((1.9, 0), (1.9, FILLET5_R))
        make_face()
    revolve(axis=Axis((-10.795, 0.825, 9.12), (0, 1, 0)))
    with BuildSketch(Plane(origin=(-10.795, 0.825, 9.12), x_dir=(0, 0, 1), z_dir=(-1, 0, 0))) as fillet5_piece_9:
        with BuildLine():
            CenterArc((3 + FILLET5_R, FILLET5_R), FILLET5_R, 180, 90)
            Line((3, FILLET5_R), (3, 0))
            Line((3, 0), (3 + FILLET5_R, 0))
        make_face()
    revolve(axis=Axis((-10.795, 0.825, 9.12), (0, 1, 0)))

    # Sketch18 → Cut-Extrude6 (cut, through all)
    with BuildSketch(Plane(origin=(0, 0.825, 0), x_dir=(1, 0, 0), z_dir=(0, 1, 0))):
        with BuildLine():
            Line((31.644069454, 11.859246829), (31.644069454, -11.859246829))
            Line((31.644069454, -11.859246829), (45.096327721, -21.605978387))
            ThreePointArc((45.096327721, -21.605978387), (42.827389147, 0), (45.096327721, 21.605978387))
            Line((45.096327721, 21.605978387), (31.644069454, 11.859246829))
        make_face()
        with BuildLine():
            Line((-31.644069454, 11.859246829), (-45.096327721, 21.605978387))
            ThreePointArc((-45.096327721, 21.605978387), (-42.827389147, 0), (-45.096327721, -21.605978387))
            Line((-45.096327721, -21.605978387), (-31.644069454, -11.859246829))
            Line((-31.644069454, -11.859246829), (-31.644069454, 11.859246829))
        make_face()
    extrude(amount=-CUT_EXTRUDE6_DEPTH, mode=Mode.SUBTRACT)

    # Fillet6
    fillet6_edges = [part.edges().sort_by_distance(p)[0] for p in [
        (38.370198587, -0.825, -16.732612608),
        (31.644069454, 0, -11.859246829),
        (42.827389147, -0.825, 0),
        (45.096327721, 0, -21.605978387),
        (38.370198587, -0.825, 16.732612608),
        (45.096327721, 0, 21.605978387),
        (31.644069454, -0.825, 0),
        (31.644069454, 0, 11.859246829),
        (38.370198587, 0.825, -16.732612608),
        (31.644069454, 0.825, 0),
        (38.370198587, 0.825, 16.732612608),
        (42.827389147, 0.825, 0),
        (-42.827389147, -0.825, 0),
        (-45.096327721, 0, 21.605978387),
        (-38.370198587, -0.825, -16.732612608),
        (-45.096327721, 0, -21.605978387),
        (-31.644069454, -0.825, 0),
        (-31.644069454, 0, -11.859246829),
        (-38.370198587, -0.825, 16.732612608),
        (-31.644069454, 0, 11.859246829),
        (-42.827389147, 0.825, 0),
        (-38.370198587, 0.825, 16.732612608),
        (-31.644069454, 0.825, 0),
        (-38.370198587, 0.825, -16.732612608),
    ]]
    fillet(fillet6_edges, radius=FILLET6_R)


solid = part.part
